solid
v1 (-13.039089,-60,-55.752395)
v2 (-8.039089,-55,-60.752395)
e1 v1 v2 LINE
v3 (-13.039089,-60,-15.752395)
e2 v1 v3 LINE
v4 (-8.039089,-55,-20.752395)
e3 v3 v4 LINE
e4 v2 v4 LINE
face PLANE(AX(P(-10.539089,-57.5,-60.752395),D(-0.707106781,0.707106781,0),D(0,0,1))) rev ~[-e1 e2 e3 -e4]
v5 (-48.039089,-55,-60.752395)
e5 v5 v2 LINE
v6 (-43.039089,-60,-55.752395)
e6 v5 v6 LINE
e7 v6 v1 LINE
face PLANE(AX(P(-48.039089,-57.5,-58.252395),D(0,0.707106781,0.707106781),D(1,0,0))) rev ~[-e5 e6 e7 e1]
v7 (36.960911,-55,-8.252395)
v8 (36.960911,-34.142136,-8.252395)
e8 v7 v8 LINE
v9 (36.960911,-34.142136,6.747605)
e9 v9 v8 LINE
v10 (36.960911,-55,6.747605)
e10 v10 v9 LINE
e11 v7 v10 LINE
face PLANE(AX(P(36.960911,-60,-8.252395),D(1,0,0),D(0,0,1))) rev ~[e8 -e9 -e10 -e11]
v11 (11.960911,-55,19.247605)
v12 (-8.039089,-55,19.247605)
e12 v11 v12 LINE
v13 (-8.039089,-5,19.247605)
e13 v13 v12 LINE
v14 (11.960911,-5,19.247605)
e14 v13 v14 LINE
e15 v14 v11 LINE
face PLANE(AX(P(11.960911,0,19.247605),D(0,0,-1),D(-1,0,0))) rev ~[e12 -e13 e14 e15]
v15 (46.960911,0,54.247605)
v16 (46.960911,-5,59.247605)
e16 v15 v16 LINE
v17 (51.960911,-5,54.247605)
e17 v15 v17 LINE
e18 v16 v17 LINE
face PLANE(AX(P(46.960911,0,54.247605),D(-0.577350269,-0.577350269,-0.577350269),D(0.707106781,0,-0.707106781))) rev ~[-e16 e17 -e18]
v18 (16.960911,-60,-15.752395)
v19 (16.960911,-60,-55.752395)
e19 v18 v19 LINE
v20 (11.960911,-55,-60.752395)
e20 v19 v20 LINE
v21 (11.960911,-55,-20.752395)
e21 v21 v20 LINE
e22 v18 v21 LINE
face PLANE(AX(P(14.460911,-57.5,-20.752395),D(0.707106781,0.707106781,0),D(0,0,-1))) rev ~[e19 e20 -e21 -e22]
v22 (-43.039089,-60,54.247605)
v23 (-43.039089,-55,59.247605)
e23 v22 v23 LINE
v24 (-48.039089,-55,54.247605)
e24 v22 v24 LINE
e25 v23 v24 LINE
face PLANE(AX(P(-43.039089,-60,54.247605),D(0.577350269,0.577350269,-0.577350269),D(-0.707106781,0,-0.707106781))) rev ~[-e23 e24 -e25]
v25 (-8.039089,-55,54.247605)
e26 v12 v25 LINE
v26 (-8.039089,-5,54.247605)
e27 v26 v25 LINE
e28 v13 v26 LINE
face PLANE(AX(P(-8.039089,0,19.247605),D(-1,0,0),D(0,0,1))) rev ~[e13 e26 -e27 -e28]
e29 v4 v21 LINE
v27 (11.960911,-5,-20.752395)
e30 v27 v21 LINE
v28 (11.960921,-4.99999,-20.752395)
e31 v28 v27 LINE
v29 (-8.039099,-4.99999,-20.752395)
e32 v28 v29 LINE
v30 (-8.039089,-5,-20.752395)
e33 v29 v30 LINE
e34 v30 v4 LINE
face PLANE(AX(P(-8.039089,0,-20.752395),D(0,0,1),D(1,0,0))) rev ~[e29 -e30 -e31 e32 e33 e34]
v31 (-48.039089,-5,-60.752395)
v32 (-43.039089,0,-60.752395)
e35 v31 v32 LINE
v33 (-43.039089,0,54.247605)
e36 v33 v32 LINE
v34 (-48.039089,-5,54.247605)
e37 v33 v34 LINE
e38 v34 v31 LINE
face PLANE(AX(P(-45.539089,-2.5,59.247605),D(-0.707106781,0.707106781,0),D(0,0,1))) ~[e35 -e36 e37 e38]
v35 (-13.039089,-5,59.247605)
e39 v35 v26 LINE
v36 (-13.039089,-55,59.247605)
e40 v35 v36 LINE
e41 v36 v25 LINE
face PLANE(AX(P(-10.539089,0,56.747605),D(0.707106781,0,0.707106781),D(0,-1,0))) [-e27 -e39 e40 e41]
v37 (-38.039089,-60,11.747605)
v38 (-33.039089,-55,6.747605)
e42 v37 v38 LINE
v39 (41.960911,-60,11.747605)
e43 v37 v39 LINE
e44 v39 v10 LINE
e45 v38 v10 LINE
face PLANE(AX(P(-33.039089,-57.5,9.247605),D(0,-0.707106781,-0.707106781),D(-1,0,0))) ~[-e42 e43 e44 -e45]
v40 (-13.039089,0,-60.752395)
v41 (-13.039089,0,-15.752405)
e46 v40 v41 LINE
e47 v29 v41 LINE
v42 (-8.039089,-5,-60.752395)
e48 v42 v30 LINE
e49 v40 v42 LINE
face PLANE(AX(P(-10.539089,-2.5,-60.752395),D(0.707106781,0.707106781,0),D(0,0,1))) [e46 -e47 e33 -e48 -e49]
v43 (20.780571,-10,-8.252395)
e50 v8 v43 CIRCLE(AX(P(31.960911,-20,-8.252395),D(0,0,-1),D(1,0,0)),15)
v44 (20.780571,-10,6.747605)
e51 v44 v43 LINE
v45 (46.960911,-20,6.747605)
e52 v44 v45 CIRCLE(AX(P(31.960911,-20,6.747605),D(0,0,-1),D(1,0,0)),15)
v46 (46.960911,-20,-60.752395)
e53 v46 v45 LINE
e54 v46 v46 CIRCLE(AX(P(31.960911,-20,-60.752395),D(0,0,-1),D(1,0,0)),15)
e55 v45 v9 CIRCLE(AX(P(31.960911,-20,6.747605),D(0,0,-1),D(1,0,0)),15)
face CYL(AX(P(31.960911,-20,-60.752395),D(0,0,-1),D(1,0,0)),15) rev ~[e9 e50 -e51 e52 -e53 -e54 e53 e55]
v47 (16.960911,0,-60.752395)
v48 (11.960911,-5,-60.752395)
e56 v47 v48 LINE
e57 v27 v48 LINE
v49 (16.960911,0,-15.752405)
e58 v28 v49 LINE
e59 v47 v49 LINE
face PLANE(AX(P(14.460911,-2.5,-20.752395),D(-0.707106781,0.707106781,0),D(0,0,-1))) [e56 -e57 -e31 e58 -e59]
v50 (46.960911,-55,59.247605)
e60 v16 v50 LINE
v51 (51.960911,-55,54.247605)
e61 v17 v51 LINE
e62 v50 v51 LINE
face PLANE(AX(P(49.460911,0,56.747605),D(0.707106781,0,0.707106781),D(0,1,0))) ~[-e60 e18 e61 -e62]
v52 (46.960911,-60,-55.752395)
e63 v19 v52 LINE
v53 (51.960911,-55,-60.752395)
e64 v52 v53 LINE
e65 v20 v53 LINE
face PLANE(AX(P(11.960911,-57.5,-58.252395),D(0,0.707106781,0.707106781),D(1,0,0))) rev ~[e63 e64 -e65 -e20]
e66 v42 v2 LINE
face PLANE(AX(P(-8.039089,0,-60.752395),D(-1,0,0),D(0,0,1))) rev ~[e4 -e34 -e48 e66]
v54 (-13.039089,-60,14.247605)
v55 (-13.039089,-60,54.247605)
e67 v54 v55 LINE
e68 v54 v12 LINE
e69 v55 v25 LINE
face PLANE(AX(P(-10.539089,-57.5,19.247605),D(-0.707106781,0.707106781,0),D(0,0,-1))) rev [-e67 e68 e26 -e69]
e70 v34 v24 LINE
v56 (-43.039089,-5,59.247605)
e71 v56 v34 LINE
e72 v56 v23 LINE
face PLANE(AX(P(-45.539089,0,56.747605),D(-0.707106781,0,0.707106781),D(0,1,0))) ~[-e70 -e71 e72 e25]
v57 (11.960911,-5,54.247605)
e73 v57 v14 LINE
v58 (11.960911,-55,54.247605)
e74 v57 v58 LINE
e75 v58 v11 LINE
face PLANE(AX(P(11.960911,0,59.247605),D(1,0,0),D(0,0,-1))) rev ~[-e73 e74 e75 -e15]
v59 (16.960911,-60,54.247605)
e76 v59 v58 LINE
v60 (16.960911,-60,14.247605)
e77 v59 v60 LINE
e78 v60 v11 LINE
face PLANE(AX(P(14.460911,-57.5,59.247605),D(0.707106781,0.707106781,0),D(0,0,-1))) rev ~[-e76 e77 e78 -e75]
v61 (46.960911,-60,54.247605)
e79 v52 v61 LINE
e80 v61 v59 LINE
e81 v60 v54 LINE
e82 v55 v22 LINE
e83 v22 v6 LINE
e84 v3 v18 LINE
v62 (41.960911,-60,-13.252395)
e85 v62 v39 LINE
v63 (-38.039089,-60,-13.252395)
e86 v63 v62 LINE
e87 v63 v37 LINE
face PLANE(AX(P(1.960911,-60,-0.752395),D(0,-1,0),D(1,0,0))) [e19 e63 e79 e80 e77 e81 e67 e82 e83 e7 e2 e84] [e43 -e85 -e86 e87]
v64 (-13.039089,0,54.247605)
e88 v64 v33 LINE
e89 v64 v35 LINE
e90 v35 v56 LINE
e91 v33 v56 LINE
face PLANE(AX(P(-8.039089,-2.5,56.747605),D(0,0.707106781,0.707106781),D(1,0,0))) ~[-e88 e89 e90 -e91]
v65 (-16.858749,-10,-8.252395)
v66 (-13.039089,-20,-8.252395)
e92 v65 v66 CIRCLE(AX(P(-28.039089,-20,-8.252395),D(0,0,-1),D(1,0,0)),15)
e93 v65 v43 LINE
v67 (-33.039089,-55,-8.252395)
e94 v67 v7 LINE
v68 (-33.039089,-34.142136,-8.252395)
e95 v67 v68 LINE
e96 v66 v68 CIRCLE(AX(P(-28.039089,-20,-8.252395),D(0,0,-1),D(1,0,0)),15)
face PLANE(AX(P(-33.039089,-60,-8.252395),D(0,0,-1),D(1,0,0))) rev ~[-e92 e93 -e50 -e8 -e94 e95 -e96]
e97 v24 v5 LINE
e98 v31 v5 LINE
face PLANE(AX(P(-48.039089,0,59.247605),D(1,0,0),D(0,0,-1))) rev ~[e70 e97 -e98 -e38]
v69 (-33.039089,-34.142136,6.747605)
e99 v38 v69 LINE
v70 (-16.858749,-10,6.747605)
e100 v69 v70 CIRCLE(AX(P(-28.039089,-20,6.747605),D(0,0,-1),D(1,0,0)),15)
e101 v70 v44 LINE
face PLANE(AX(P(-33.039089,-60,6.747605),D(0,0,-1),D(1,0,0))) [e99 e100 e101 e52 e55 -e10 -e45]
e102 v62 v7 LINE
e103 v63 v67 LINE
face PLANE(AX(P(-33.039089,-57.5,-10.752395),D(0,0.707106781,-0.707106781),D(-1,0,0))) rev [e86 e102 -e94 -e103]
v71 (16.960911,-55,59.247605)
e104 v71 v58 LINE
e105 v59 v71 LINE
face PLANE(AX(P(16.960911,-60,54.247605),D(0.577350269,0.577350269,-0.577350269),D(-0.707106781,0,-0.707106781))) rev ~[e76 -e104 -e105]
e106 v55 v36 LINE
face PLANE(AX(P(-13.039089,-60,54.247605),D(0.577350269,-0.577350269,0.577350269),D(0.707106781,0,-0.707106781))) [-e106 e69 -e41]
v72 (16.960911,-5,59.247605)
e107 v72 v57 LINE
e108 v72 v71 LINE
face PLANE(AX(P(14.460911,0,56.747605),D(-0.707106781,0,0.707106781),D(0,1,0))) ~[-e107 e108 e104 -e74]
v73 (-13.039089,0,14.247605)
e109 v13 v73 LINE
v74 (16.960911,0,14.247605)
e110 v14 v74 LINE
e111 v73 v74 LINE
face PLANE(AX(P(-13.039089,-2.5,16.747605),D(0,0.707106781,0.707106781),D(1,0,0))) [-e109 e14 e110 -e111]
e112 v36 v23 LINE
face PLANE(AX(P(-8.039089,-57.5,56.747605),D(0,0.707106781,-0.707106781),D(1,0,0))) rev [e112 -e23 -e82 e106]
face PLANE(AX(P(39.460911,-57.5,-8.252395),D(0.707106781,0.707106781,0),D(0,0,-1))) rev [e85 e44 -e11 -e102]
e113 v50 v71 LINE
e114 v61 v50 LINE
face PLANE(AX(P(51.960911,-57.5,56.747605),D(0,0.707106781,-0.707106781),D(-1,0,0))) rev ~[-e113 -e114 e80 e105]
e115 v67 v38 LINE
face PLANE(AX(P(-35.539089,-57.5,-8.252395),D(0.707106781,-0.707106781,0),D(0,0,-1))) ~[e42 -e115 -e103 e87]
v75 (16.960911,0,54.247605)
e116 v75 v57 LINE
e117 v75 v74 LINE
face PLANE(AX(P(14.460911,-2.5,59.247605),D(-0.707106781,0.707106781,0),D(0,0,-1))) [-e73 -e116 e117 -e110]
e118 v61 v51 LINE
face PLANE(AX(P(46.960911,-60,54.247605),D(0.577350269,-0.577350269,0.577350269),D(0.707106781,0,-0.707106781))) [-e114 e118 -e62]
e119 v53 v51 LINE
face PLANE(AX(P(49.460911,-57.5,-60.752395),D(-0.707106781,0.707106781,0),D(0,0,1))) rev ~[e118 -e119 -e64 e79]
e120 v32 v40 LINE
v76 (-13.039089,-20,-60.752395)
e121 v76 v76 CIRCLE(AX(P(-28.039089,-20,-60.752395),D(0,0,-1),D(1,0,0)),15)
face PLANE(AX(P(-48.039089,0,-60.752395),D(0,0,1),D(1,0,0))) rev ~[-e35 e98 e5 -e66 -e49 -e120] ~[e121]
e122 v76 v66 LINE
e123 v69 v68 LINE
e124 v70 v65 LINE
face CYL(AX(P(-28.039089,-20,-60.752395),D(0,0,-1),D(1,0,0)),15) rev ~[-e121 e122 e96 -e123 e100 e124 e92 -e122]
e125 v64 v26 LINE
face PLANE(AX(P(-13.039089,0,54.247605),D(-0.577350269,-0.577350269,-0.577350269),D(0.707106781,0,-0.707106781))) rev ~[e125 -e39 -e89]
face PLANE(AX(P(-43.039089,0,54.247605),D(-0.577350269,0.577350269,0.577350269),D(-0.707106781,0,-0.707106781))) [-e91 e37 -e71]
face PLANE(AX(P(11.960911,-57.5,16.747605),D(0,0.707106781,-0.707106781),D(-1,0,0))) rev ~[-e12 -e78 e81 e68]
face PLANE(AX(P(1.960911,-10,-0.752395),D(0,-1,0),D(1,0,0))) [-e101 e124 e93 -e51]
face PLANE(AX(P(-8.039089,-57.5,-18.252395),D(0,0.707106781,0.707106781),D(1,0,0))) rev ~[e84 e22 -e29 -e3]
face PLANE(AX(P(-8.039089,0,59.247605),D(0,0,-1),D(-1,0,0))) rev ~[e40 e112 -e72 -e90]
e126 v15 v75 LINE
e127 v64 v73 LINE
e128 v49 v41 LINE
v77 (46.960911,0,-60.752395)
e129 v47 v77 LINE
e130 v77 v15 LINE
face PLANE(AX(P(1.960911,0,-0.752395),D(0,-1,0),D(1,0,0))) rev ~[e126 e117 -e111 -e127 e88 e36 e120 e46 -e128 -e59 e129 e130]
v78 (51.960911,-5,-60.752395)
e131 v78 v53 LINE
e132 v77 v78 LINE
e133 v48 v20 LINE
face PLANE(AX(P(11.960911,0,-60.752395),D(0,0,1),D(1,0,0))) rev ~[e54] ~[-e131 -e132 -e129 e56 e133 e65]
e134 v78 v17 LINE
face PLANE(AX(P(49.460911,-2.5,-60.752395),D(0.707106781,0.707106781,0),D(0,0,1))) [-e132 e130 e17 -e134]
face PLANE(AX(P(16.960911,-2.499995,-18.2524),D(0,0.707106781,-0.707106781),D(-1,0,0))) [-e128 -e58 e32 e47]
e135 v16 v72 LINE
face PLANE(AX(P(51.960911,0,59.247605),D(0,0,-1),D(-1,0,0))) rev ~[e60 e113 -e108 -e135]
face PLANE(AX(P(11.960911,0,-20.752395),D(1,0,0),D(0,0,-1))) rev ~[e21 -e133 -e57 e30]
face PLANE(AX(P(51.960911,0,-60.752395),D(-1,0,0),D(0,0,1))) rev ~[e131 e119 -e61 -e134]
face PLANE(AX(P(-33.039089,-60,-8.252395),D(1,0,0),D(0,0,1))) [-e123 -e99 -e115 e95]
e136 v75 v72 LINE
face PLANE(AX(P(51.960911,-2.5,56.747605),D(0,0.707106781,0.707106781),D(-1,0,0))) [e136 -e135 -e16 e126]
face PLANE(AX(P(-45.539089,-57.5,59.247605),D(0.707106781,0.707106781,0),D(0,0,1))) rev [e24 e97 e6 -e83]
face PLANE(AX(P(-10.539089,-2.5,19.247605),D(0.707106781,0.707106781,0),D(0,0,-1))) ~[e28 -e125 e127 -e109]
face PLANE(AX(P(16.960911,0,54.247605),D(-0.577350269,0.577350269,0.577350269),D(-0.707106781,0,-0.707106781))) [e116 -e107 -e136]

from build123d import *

# Parameters (mm, degrees)
F1_DEPTH = 60
F2_W     = 70
F2_H     = 15
F3_DEPTH = 50
F4_R     = 15
F5_R     = 15
F6_DEPTH = 67.5
F7_SIZE  = 5
F8_SIZE  = 4.99999
F9_SIZE  = 5


# Not quite as in the source:
# - a fillet or chamfer is up to 0.001 mm smaller than in the source, because OpenCascade refuses the exact size


with BuildPart() as f1:
    # F0 (on Front) → F1 (new body)
    with BuildSketch(Plane.XZ):
        Polygon((-8.0390890029, 59.2476050396), (-48.0390890029, 59.2476050396), (-48.0390890029, -60.7523949604), (-8.0390890029, -60.7523949604), (-8.0390890029, -20.7523949604), (11.9609109971, -20.7523949604), (11.9609109971, -60.7523949604), (51.9609109971, -60.7523949604), (51.9609109971, 59.2476050396), (11.9609109971, 59.2476050396), (11.9609109971, 19.2476050396), (-8.0390890029, 19.2476050396), align=None)
    extrude(amount=F1_DEPTH)

    # F2 (on face) → F3 (cut)
    with BuildSketch(Plane.XZ.offset(60)):
        with Locations((1.9609109971, -0.7523949604)):
            Rectangle(F2_W, F2_H)
    extrude(amount=-F3_DEPTH, mode=Mode.SUBTRACT)

    # F4 (on face) + F5 (on face) → F6 (cut)
    with BuildSketch(Plane(origin=(0, 0, -60.7523949604), x_dir=(1, 0, 0), z_dir=(0, 0, -1))):
        with Locations((-28.0390890029, 20)):
            Circle(F4_R)
    with BuildSketch(Plane(origin=(0, 0, -60.7523949604), x_dir=(1, 0, 0), z_dir=(0, 0, -1))):
        with Locations((31.9609109971, 20)):
            Circle(F5_R)
    extrude(amount=-F6_DEPTH, mode=Mode.SUBTRACT)

    # F7
    f7_edges = [f1.edges().sort_by_distance(p)[0] for p in [
        (-48.039089, -30, 59.247605),
        (-8.039089, -30, 59.247605),
        (11.960911, -30, 59.247605),
        (51.960911, -30, 59.247605),
        (31.960911, -60, 59.247605),
        (-28.039089, -60, 59.247605),
        (31.960911, 0, 59.247605),
        (-28.039089, 0, 59.247605),
        (1.960911, -60, 6.747605),
        (-33.039089, -60, -0.752395),
        (1.960911, -60, -8.252395),
        (36.960911, -60, -0.752395),
        (51.960911, -60, -0.752395),
        (51.960911, 0, -0.752395),
        (11.960911, -60, 39.247605),
        (1.960911, -60, 19.247605),
        (-8.039089, -60, 39.247605),
        (31.960911, -60, -60.752395),
        (11.960911, -60, -40.752395),
        (-48.039089, -60, -0.752395),
        (1.960911, -60, -20.752395),
        (-28.039089, -60, -60.752395),
        (-8.039089, -60, -40.752395),
        (-48.039089, 0, -0.752395),
        (11.960911, 0, -40.752395),
        (-8.039089, 0, -40.752395),
        (11.960911, 0, 39.247605),
        (-8.039089, 0, 39.247605),
    ]]
    chamfer(f7_edges, length=F7_SIZE)

    # F8 (size 5 in the source; OpenCascade refuses exactly that, so slightly less here)
    f8_edges = [f1.edges().sort_by_distance(p)[0] for p in [
        (1.960911, 0, -20.752395),
    ]]
    chamfer(f8_edges, length=F8_SIZE)

    # F9
    f9_edges = [f1.edges().sort_by_distance(p)[0] for p in [
        (1.960911, 0, 19.247605),
    ]]
    chamfer(f9_edges, length=F9_SIZE)


solid = f1.part
